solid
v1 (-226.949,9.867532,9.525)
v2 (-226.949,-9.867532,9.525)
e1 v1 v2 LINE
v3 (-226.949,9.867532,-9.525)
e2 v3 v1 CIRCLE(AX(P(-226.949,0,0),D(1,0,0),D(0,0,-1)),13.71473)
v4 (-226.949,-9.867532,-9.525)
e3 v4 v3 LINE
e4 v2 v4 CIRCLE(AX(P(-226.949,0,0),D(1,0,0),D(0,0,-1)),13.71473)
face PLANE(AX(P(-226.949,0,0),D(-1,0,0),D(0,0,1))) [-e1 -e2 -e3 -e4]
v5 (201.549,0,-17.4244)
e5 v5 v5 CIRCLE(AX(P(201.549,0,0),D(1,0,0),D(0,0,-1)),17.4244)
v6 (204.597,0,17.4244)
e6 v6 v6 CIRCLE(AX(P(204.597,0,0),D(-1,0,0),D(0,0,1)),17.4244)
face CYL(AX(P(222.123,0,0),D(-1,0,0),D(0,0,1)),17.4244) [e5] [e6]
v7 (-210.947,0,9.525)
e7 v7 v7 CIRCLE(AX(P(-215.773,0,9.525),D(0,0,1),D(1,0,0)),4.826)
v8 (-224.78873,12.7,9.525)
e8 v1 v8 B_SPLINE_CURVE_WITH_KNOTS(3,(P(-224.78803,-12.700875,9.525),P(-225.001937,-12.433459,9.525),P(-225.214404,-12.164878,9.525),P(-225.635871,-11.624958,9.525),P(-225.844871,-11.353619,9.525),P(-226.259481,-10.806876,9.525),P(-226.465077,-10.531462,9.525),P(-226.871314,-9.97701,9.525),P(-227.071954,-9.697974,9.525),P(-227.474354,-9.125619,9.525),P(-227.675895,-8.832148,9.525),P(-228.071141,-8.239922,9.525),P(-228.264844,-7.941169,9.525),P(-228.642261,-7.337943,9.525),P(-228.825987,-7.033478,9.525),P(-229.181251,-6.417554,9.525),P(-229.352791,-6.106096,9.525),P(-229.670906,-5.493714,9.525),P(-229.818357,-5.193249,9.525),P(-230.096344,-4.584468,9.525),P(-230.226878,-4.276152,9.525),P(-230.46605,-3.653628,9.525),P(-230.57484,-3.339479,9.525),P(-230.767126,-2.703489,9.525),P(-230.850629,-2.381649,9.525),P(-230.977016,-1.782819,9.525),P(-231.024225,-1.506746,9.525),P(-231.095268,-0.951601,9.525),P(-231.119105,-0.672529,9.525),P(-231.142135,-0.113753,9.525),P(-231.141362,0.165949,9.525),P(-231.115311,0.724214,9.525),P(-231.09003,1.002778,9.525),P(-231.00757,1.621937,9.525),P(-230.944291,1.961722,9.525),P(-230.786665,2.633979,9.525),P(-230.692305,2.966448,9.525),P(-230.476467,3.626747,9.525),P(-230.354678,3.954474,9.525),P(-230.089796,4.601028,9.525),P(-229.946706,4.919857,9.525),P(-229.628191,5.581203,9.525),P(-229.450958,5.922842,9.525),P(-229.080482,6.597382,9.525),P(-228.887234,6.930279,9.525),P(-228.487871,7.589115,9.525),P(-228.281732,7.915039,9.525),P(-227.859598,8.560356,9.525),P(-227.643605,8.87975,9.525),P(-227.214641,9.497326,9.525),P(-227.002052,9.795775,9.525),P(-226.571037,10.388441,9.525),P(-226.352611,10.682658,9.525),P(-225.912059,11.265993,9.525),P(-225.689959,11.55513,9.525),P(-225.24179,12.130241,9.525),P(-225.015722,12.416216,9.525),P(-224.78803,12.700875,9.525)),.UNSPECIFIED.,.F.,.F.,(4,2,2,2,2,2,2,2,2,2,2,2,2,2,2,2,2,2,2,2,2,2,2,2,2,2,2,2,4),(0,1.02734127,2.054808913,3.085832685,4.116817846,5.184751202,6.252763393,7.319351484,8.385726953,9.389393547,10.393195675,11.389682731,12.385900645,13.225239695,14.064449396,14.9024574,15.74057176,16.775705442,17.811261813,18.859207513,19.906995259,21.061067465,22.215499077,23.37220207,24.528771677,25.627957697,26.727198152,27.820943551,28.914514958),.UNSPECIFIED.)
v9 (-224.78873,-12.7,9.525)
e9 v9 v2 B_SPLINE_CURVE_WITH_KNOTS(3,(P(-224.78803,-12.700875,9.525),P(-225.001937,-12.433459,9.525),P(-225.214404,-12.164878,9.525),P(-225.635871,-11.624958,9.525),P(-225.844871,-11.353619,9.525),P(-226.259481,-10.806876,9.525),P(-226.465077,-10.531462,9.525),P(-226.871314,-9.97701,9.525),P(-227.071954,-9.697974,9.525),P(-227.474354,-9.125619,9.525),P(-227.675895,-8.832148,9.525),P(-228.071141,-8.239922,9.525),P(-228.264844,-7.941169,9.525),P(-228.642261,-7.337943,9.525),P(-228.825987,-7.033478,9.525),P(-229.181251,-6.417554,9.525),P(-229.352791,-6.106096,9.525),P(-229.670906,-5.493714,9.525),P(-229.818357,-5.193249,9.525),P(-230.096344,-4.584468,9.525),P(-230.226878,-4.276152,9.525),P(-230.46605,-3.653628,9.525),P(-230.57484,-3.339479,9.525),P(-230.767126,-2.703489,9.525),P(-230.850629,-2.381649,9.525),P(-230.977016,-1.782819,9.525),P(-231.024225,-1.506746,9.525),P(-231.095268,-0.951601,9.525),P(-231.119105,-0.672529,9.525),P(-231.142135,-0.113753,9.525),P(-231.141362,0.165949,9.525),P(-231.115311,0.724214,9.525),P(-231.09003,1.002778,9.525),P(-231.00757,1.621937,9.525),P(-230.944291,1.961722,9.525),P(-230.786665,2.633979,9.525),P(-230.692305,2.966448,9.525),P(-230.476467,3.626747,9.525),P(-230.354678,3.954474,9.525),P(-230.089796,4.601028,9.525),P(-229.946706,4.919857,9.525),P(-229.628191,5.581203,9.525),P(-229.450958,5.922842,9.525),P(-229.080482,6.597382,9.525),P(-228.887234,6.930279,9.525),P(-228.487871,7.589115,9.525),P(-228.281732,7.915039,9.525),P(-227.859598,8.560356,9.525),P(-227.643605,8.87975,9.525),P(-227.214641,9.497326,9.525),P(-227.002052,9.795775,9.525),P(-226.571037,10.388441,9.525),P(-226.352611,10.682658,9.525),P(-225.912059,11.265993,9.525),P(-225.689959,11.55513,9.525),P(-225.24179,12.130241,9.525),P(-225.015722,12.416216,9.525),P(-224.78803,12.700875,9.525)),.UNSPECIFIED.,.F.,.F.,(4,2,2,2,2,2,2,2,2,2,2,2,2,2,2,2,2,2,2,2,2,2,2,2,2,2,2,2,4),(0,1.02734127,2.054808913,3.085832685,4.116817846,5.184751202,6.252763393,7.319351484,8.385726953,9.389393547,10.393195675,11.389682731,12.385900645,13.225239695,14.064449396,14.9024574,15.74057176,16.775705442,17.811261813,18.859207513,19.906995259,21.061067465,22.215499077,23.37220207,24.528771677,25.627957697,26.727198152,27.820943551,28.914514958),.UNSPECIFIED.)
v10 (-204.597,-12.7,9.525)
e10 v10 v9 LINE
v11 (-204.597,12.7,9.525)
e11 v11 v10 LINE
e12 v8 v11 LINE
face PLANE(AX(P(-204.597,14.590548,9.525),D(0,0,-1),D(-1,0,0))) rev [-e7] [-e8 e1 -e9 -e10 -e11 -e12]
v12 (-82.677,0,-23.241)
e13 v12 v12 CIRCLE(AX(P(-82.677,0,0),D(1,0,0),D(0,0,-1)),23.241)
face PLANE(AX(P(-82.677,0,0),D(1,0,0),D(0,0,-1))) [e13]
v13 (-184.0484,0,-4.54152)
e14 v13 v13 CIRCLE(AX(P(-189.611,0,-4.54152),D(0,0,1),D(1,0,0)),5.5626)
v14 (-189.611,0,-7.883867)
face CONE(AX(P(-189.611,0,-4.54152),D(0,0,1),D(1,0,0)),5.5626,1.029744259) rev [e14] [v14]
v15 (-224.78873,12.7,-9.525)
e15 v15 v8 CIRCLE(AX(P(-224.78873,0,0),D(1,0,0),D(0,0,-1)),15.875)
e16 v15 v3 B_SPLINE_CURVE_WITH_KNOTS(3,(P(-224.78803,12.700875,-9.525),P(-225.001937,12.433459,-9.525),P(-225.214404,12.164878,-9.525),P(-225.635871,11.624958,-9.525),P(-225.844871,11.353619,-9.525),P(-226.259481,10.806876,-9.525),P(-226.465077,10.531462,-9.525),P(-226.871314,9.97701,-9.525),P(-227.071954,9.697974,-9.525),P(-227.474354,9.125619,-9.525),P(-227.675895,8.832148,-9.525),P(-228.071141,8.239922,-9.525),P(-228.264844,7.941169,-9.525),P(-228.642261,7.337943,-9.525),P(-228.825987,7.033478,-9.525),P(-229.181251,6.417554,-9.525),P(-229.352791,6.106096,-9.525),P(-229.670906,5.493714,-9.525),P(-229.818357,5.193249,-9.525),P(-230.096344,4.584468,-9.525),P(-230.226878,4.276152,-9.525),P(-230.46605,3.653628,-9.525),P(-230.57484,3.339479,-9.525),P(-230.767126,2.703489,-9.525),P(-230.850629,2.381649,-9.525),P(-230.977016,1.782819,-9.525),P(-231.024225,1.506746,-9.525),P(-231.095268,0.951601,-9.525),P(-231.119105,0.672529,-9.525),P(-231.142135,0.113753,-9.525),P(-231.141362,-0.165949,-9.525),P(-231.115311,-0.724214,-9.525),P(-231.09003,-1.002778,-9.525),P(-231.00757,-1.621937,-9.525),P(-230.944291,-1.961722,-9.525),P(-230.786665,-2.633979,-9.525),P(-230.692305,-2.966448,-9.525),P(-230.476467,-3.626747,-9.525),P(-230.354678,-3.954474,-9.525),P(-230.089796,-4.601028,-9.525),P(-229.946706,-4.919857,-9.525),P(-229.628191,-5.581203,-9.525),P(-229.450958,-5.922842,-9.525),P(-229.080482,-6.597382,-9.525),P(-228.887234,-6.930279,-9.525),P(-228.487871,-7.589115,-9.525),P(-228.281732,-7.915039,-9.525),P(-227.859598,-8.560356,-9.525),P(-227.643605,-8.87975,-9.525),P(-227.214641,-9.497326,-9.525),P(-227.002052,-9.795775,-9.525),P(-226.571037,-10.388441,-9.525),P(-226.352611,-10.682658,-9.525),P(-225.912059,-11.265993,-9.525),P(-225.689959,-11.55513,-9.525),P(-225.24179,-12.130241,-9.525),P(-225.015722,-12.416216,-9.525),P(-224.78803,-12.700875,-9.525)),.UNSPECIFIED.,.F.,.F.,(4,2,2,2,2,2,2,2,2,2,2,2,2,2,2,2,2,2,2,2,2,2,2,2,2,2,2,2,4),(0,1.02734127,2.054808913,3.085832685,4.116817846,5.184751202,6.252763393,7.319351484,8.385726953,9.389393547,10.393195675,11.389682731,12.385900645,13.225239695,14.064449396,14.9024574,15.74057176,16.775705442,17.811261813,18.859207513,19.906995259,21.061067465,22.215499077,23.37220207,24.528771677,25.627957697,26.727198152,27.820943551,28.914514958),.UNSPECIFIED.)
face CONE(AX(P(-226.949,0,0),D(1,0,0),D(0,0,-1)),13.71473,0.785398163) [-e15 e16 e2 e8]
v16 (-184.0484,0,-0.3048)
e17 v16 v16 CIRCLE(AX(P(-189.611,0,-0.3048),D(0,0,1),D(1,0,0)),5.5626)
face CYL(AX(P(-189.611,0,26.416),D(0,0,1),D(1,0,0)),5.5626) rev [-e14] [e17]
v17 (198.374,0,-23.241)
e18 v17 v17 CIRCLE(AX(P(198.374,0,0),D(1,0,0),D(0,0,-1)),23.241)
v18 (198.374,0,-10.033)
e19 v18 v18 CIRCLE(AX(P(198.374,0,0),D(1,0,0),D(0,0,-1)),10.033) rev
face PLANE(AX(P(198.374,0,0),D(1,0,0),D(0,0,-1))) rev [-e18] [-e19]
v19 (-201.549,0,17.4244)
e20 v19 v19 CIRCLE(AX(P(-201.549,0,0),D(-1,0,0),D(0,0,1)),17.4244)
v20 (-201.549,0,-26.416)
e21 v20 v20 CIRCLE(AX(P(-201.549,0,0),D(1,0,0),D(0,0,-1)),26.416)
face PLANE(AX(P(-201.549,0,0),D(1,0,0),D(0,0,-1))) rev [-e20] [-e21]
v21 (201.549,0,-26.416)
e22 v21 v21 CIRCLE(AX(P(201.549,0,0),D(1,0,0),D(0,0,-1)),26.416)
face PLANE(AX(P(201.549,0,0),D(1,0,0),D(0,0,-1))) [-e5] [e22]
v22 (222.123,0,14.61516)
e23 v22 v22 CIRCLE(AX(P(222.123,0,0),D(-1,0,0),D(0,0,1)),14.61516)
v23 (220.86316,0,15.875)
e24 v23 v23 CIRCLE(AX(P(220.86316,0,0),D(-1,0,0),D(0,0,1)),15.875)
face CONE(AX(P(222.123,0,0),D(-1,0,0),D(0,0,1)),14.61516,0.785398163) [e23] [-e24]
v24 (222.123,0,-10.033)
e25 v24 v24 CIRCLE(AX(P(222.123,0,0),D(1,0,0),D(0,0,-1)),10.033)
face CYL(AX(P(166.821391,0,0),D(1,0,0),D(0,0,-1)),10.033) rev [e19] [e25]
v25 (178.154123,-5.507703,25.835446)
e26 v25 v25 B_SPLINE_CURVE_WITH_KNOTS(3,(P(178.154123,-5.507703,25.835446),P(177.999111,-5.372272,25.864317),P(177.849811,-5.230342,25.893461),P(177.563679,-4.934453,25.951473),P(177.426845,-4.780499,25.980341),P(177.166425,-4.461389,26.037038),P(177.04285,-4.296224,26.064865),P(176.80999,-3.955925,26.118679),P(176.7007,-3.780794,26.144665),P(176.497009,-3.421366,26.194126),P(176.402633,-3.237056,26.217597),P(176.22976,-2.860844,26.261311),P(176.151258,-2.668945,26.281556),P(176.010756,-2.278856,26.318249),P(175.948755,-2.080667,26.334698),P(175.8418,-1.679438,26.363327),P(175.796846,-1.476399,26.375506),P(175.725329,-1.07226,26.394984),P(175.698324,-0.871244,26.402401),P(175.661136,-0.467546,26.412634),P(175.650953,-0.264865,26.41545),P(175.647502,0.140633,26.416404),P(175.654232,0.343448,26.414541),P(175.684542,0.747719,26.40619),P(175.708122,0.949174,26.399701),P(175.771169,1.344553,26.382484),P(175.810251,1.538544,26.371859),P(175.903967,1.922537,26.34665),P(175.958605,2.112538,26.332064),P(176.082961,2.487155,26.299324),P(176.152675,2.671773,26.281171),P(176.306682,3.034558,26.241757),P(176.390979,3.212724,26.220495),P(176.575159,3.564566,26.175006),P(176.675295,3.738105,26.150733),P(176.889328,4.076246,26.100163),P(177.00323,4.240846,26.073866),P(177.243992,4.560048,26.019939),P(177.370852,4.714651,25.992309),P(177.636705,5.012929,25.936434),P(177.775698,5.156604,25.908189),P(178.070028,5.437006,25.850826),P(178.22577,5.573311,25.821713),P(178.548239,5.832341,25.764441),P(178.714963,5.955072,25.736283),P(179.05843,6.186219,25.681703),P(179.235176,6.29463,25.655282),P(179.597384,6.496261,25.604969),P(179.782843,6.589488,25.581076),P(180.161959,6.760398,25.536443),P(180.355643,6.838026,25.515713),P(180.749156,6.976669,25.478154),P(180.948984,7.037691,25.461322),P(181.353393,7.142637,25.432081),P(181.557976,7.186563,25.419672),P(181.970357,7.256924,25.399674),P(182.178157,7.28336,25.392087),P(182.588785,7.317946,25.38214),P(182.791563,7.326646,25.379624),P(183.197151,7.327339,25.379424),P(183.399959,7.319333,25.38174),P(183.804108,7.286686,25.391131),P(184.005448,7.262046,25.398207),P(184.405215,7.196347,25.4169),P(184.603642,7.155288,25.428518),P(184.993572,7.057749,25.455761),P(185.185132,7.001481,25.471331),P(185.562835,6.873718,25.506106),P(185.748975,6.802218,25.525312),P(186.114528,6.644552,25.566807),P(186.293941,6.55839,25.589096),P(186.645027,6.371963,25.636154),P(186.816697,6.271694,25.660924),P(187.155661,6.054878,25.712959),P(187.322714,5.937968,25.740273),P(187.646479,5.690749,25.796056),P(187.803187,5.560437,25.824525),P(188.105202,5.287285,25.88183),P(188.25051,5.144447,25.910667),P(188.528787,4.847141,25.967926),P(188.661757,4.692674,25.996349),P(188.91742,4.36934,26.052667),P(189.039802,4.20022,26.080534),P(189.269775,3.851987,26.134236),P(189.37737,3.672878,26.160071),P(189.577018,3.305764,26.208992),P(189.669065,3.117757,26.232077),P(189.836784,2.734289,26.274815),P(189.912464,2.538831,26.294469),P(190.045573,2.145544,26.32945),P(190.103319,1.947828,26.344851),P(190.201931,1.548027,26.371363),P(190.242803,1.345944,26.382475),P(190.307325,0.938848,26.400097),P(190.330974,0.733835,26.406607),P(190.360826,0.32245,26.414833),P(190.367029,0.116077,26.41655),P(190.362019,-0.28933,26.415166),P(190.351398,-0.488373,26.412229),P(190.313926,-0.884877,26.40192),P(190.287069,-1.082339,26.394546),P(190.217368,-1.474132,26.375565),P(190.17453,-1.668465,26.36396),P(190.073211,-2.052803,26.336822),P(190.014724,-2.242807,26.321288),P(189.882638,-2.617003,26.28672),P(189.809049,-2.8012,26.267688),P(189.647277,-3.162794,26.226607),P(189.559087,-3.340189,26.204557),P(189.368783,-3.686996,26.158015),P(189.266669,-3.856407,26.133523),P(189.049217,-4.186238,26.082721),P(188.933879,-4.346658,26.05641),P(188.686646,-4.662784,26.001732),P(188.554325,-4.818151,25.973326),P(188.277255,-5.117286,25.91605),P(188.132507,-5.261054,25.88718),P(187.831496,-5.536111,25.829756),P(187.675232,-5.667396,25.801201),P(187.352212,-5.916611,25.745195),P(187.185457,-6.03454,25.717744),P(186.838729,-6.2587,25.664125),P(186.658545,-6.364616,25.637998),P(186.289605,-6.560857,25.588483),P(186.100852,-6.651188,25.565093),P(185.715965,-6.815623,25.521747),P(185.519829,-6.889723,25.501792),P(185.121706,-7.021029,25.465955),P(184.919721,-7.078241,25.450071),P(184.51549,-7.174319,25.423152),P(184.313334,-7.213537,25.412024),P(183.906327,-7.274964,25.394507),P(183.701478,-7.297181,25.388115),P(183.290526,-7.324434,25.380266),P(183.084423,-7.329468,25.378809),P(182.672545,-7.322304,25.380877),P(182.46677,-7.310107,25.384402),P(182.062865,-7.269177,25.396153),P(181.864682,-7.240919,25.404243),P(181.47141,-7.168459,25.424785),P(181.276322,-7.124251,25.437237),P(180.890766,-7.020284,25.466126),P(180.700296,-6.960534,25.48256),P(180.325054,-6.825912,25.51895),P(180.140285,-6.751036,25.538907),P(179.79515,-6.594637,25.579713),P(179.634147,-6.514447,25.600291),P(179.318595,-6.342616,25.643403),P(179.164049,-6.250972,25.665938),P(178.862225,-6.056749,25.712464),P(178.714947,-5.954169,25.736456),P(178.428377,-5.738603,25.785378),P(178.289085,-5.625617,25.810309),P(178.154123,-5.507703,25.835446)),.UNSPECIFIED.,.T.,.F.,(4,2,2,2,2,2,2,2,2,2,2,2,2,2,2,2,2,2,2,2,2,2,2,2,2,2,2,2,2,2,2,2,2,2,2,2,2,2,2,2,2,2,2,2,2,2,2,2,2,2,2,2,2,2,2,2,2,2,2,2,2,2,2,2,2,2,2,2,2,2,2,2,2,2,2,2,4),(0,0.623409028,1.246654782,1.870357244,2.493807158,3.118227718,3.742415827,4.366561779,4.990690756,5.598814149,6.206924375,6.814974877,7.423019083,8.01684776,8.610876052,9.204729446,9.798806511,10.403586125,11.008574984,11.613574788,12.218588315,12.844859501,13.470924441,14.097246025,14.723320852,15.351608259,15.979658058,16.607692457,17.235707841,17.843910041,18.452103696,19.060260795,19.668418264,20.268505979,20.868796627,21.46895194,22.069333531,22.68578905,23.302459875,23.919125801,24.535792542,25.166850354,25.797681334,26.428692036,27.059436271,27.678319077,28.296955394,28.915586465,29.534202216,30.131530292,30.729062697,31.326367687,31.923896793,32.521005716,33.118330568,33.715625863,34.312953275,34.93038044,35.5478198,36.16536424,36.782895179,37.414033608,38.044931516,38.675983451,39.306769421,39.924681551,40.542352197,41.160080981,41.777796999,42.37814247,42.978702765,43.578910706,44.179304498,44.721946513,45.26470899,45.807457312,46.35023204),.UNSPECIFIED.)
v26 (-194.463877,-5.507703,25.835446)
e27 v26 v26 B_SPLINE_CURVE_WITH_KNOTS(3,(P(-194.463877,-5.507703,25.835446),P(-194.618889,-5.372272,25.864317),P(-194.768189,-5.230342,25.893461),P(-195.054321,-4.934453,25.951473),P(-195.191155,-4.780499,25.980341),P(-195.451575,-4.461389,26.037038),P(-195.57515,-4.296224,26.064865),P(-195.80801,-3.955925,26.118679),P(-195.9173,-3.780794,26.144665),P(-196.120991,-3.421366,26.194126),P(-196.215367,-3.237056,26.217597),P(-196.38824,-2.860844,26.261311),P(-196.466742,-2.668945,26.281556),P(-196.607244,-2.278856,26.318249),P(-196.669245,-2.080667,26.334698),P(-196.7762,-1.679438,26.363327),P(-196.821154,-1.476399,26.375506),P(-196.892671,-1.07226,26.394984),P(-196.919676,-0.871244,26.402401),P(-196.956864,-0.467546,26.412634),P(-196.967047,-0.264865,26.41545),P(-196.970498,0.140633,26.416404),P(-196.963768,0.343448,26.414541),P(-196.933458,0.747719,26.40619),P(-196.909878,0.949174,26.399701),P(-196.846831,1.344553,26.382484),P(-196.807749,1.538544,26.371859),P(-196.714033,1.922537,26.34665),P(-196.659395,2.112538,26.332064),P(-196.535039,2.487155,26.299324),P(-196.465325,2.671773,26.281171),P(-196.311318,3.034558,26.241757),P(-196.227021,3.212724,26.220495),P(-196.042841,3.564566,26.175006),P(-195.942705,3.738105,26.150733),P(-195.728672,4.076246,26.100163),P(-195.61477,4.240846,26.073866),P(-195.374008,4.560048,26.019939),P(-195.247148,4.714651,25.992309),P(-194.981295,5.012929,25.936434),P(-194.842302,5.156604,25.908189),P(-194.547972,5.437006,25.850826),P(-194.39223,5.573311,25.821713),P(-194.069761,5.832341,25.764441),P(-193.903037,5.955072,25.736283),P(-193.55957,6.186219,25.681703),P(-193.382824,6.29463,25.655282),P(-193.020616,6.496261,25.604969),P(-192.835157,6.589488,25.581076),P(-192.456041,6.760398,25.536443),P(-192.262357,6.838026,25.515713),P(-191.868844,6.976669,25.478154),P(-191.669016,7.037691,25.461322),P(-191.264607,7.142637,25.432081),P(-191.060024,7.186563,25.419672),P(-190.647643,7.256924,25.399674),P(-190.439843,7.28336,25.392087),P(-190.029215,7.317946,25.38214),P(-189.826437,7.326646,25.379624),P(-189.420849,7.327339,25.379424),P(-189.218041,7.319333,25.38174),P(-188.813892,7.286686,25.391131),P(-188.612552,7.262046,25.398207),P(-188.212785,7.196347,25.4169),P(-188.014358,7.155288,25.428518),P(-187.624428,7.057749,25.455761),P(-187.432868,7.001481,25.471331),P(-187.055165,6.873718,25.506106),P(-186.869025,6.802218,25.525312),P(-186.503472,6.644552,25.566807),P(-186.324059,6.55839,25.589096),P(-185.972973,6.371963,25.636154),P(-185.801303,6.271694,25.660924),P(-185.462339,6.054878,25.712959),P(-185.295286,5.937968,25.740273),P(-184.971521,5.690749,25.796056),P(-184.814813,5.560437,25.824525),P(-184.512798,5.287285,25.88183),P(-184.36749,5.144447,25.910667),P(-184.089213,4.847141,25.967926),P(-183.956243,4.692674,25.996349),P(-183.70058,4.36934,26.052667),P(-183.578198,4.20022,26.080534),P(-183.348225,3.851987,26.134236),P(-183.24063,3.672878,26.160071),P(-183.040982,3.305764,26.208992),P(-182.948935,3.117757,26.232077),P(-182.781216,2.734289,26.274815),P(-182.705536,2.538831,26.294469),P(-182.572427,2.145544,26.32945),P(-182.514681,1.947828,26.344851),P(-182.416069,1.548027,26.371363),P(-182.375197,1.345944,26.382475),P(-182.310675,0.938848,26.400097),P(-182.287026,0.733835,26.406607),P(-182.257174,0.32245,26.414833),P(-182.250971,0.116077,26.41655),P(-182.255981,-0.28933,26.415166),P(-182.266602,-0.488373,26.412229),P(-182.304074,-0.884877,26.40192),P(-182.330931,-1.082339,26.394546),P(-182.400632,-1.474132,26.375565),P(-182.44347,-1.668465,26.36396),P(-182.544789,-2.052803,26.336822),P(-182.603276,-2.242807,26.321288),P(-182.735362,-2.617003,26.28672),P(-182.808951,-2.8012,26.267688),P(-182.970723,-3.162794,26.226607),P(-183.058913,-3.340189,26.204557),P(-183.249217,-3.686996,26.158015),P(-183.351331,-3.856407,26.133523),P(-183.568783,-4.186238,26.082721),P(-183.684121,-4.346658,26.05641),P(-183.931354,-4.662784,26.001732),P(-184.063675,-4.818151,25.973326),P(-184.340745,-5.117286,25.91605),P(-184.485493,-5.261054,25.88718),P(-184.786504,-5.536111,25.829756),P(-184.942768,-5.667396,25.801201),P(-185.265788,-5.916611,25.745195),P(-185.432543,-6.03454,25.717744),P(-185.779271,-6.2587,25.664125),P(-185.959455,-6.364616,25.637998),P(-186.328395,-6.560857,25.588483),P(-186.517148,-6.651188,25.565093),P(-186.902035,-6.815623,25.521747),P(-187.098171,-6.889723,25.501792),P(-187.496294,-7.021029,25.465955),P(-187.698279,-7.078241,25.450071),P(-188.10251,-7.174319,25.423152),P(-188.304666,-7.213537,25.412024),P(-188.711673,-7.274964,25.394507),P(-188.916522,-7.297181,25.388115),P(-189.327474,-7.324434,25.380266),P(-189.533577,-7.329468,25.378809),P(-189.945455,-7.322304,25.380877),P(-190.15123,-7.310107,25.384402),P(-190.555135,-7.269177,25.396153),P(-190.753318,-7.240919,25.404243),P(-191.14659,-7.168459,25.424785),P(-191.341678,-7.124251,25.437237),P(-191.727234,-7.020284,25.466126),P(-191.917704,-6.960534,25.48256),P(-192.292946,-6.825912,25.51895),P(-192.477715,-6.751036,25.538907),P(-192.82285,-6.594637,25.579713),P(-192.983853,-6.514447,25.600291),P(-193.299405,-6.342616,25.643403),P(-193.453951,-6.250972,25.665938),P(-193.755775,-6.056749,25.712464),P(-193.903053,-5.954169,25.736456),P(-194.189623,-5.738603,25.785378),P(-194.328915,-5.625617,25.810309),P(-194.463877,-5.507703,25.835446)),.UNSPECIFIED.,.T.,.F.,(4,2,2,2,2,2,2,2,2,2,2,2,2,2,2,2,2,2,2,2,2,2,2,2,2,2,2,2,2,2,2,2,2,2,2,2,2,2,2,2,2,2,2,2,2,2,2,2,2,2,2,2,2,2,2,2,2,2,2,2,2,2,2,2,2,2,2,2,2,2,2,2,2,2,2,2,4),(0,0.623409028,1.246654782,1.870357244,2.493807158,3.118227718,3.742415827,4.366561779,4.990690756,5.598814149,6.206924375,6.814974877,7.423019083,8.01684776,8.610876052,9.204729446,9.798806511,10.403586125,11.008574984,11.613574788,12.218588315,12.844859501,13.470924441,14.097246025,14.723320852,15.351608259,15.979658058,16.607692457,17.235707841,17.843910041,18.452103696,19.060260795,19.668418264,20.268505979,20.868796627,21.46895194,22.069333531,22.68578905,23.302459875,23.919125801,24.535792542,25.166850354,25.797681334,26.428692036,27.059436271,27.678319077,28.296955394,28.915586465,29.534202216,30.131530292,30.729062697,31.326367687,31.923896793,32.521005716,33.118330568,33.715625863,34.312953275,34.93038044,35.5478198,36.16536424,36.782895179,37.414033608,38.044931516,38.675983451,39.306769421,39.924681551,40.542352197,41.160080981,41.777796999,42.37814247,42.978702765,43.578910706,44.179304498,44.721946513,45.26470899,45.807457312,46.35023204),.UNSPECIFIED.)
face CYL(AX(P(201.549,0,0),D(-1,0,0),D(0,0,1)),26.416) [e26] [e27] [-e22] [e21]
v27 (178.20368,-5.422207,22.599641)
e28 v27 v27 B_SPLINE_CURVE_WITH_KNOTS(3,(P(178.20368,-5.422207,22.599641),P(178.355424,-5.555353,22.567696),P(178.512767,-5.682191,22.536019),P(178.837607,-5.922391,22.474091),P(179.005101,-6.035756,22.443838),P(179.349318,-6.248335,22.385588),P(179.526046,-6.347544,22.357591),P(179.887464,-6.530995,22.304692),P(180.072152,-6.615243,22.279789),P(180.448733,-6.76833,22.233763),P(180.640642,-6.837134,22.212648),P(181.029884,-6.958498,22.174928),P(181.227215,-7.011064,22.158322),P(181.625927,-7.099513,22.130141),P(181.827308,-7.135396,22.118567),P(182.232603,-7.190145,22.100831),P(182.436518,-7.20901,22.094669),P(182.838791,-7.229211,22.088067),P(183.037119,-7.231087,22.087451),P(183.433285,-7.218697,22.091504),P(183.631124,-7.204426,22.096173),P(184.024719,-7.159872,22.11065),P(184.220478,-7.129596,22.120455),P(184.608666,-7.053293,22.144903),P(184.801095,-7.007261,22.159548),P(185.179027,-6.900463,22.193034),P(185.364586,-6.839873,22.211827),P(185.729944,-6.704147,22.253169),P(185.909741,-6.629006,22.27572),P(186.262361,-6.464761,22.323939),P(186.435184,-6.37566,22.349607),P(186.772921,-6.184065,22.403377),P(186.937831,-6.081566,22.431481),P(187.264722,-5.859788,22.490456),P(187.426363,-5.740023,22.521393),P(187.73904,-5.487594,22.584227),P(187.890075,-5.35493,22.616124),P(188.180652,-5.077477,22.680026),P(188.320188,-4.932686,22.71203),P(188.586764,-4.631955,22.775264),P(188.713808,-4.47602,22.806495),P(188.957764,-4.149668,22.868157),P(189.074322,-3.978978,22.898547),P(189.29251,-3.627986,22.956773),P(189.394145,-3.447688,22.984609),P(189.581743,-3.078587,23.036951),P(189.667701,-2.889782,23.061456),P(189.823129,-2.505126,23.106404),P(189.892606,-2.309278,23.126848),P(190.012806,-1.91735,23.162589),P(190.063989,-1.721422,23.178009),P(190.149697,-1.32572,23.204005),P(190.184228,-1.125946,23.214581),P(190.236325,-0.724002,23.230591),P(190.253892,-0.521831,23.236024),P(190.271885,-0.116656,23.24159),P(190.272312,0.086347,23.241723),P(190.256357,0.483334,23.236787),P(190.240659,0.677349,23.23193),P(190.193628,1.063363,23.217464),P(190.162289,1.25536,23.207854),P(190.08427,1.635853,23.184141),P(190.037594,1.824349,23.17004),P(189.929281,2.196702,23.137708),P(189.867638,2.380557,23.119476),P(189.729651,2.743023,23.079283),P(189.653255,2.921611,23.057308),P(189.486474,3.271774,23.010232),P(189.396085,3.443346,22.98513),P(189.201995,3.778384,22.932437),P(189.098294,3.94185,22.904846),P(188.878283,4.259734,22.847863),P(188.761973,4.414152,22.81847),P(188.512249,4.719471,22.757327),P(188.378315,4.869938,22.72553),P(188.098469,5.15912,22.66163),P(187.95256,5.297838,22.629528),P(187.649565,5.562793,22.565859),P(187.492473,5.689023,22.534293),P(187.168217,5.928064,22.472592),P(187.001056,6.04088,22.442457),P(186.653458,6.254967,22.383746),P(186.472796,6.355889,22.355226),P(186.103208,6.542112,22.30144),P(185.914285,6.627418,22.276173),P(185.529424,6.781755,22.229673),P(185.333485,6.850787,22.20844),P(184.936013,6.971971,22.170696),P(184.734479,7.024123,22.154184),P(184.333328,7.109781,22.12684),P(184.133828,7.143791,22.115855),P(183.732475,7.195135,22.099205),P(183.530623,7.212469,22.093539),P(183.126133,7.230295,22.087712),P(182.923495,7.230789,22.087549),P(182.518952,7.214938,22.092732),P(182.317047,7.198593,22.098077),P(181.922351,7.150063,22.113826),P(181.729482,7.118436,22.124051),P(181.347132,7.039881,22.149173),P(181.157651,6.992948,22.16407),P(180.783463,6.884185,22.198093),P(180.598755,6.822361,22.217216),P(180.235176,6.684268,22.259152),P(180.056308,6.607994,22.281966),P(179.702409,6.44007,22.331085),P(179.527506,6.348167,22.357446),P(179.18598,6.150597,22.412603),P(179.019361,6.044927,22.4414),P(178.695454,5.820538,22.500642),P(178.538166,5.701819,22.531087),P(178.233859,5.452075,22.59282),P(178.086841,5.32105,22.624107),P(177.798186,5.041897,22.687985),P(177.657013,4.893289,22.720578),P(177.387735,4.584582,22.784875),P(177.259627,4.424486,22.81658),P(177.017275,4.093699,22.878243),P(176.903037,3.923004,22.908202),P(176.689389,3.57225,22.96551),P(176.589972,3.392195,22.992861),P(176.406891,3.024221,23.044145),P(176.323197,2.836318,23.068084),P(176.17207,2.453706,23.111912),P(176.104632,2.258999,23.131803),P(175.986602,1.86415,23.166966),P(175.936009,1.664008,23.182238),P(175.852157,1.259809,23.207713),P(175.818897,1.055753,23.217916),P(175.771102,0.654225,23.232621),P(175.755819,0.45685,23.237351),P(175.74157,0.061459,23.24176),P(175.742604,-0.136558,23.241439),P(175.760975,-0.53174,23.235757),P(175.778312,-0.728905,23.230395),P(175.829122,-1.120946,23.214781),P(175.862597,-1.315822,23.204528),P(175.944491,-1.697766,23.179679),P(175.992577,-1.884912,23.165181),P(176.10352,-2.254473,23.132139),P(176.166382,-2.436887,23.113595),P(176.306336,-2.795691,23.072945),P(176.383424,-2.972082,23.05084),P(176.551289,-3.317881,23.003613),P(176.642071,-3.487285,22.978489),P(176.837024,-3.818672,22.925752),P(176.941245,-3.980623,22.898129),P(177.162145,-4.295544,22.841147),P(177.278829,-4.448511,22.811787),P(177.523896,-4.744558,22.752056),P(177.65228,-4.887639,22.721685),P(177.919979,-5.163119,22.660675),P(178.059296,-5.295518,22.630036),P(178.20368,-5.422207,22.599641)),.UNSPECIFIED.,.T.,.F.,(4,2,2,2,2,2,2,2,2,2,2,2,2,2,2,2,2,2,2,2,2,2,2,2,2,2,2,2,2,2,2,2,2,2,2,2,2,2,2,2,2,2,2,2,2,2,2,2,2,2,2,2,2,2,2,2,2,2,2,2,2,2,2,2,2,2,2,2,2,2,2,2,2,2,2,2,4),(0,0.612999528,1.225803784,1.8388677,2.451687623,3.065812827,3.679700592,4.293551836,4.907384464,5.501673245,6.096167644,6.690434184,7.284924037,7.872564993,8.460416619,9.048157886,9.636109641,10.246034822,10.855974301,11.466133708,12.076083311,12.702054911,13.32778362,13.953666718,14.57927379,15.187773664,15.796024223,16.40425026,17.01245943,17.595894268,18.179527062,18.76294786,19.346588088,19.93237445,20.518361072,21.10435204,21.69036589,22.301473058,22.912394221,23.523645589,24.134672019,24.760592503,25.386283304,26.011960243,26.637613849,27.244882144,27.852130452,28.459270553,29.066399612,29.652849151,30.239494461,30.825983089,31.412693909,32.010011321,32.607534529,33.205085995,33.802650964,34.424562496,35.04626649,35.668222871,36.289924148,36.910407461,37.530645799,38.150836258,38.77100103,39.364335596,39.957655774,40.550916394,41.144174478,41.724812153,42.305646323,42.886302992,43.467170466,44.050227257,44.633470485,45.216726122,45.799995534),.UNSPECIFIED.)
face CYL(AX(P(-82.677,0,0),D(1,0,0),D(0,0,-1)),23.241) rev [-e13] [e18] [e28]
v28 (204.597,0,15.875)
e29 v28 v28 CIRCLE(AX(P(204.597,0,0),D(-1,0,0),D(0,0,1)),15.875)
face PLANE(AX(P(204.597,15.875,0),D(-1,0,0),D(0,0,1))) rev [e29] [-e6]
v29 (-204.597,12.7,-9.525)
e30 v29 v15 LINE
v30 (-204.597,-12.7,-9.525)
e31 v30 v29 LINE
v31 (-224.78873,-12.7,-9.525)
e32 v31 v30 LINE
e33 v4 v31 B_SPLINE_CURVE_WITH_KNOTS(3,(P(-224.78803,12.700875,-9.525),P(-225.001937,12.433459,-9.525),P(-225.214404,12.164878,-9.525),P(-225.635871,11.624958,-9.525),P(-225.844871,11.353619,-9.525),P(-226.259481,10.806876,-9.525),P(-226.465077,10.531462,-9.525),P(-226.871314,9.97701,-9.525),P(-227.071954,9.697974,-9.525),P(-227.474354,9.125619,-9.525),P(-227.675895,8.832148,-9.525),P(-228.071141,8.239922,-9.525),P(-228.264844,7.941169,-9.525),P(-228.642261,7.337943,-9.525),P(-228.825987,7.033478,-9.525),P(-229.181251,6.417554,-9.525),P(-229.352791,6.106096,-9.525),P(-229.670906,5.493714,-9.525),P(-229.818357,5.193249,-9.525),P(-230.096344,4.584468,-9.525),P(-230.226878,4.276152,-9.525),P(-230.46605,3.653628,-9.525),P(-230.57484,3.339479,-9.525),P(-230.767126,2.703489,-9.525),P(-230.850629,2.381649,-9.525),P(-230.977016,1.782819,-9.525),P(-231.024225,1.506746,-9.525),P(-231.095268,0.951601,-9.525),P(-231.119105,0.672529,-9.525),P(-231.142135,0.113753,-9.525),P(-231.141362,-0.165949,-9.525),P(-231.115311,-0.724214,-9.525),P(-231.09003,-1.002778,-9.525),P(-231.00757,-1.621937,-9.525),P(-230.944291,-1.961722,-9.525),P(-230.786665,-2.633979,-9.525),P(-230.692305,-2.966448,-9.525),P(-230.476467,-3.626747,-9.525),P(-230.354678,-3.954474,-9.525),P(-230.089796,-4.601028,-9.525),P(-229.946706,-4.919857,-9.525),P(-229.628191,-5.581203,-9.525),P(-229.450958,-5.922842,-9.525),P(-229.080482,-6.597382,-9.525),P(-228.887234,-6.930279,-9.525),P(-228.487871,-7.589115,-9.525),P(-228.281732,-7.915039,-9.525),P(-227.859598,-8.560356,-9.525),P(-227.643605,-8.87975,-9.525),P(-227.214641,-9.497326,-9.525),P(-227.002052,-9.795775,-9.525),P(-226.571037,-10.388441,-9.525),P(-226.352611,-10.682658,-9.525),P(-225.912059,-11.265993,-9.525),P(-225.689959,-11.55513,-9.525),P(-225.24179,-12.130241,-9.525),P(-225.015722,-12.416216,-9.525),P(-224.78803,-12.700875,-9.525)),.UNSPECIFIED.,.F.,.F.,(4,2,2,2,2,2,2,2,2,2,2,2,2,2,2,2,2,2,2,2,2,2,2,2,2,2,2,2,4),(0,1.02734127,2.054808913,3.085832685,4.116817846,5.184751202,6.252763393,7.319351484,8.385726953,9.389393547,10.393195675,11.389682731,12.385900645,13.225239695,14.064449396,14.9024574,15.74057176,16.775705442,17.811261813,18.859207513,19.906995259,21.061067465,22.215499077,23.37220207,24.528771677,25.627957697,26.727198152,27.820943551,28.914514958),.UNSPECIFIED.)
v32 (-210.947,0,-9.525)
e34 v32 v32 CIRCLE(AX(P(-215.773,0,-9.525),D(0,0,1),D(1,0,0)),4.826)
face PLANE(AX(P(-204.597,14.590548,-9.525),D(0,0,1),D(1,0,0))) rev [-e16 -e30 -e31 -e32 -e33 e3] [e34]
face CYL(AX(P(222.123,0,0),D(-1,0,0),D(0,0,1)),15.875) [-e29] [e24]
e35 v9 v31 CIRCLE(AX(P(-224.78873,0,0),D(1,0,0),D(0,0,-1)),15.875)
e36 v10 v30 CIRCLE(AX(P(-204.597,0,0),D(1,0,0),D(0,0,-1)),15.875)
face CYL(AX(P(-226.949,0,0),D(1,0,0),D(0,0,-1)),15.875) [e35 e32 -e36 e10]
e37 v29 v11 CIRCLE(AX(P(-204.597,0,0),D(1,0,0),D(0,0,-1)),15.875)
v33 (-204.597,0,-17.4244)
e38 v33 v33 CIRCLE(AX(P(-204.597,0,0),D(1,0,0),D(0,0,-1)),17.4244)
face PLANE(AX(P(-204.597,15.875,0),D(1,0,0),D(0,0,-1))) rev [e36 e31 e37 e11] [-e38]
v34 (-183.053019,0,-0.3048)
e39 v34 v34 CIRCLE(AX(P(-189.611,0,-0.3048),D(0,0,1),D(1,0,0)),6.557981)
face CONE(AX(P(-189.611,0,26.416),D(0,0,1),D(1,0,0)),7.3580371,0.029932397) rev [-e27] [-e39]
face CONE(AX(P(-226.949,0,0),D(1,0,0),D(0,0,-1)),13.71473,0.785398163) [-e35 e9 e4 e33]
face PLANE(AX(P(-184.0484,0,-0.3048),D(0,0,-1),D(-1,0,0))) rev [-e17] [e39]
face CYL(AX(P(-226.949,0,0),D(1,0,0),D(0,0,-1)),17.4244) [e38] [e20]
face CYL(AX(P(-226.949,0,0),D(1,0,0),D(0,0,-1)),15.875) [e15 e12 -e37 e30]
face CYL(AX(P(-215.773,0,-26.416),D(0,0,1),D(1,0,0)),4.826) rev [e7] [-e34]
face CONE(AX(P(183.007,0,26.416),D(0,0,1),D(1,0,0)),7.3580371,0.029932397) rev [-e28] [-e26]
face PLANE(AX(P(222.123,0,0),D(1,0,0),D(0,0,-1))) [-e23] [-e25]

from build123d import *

# Parameters (mm, degrees)
SKETCH1_R                         = 26.416
BOSS_EXTRUDE1_DEPTH               = 201.549
SKETCH8_R                         = 17.4244
BOSS_EXTRUDE2_DEPTH               = 25.4
CUT_EXTRUDE1_START                = -22.352
CUT_EXTRUDE1_DEPTH                = 22.352
SKETCH16_R                        = 4.826
CUT_EXTRUDE2_DEPTH                = 232.290745898
BOSS_EXTRUDE3_START               = 20.574
SKETCH17_R                        = 17.4244
BOSS_EXTRUDE3_DEPTH               = 20.574
SKETCH20_R                        = 10.033
CUT_EXTRUDE3_DEPTH                = 23.749
SKETCH22_R                        = 23.241
CUT_EXTRUDE4_DEPTH                = 281.051
F_1_4_NPT_TAPPED_HOLE3_AT_2_COUNT = 2
F_1_4_NPT_TAPPED_HOLE3_AT_2_PITCH = 372.618


# Read off the part's stored shape, not the designer's step: 1-1/4-7 Machine Threads Stud1, 1-1/4-12 Machine Threads Stud1
with BuildPart() as part:
    # Sketch1 → Boss-Extrude1 (new, symmetric)
    with BuildSketch(Plane(origin=(0, 0, 0), x_dir=(0, 0, -1), z_dir=(1, 0, 0))):
        Circle(SKETCH1_R)
    extrude(amount=BOSS_EXTRUDE1_DEPTH, both=True)

    # Sketch8 → Boss-Extrude2 (add)
    with BuildSketch(Plane.ZY.offset(201.549)):
        Circle(SKETCH8_R)
    extrude(amount=BOSS_EXTRUDE2_DEPTH)

    # 1-1/4-7 Machine Threads Stud1 outline → 1-1/4-7 Machine Threads Stud1 (revolve, cut)
    with BuildSketch(Plane.YX):
        Polygon((13.71473, -226.949), (17.4244, -226.949), (17.4244, -204.597), (15.875, -204.597), (15.875, -224.78873), align=None)
    revolve(axis=Axis((0, 0, 0), (1, 0, 0)), mode=Mode.SUBTRACT)

    # Sketch15 → Cut-Extrude1 (cut)
    with BuildSketch(Plane.ZY.offset(226.949).offset(CUT_EXTRUDE1_START)):
        with BuildLine():
            Line((-9.525, 14.59054798), (-9.525, -14.59054798))
            ThreePointArc((-9.525, -14.59054798), (-17.4244, 0), (-9.525, 14.59054798))
        make_face()
        with BuildLine():
            Line((9.525, 14.59054798), (9.525, -14.59054798))
            ThreePointArc((9.525, -14.59054798), (17.4244, 0), (9.525, 14.59054798))
        make_face()
    extrude(amount=CUT_EXTRUDE1_DEPTH, mode=Mode.SUBTRACT)

    # Sketch16 → Cut-Extrude2 (cut, through all)
    with BuildSketch(Plane.XY.offset(9.525)):
        with Locations((-215.773, 0)):
            Circle(SKETCH16_R)
    extrude(amount=-CUT_EXTRUDE2_DEPTH, mode=Mode.SUBTRACT)

    # Sketch17 → Boss-Extrude3 (add)
    with BuildSketch(Plane(origin=(201.549, 0, 0), x_dir=(0, 0, -1), z_dir=(1, 0, 0)).offset(BOSS_EXTRUDE3_START)):
        Circle(SKETCH17_R)
    extrude(amount=-BOSS_EXTRUDE3_DEPTH)

    # Sketch20 → Cut-Extrude3 (cut)
    with BuildSketch(Plane(origin=(222.123, 0, 0), x_dir=(0, 0, -1), z_dir=(1, 0, 0))):
        Circle(SKETCH20_R)
    extrude(amount=-CUT_EXTRUDE3_DEPTH, mode=Mode.SUBTRACT)

    # Sketch22 → Cut-Extrude4 (cut)
    with BuildSketch(Plane(origin=(198.374, 0, 0), x_dir=(0, 0, -1), z_dir=(1, 0, 0))):
        Circle(SKETCH22_R)
    extrude(amount=-CUT_EXTRUDE4_DEPTH, mode=Mode.SUBTRACT)

    # Sketch26 → 1/4 NPT Tapped Hole3 (revolve, cut)
    with BuildSketch(Plane(origin=(-189.611, 0, 26.416), x_dir=(0, -1, 0), z_dir=(1, 0, 0))):
        Polygon((0, 0), (0, 34.299867279), (5.5626, 30.95752), (5.5626, 26.7208), (6.557980564, 26.7208), (7.3580371, 0), align=None)
    f_1_4_npt_tapped_hole3 = revolve(axis=Axis((-189.611, 0, 32.766), (0, 0, -1)), mode=Mode.SUBTRACT)

    # 1/4 NPT Tapped Hole3 at 2: 1/4 NPT Tapped Hole3 ×2
    with Locations(*[(i * F_1_4_NPT_TAPPED_HOLE3_AT_2_PITCH, 0, 0) for i in range(1, F_1_4_NPT_TAPPED_HOLE3_AT_2_COUNT)]):
        add(f_1_4_npt_tapped_hole3, mode=Mode.SUBTRACT)

    # 1-1/4-12 Machine Threads Stud1 outline → 1-1/4-12 Machine Threads Stud1 (revolve, cut)
    with BuildSketch(Plane.YX):
        Polygon((17.4244, 222.123), (14.61516, 222.123), (15.875, 220.86316), (15.875, 204.597), (17.4244, 204.597), align=None)
    revolve(axis=Axis((0, 0, 0), (1, 0, 0)), mode=Mode.SUBTRACT)


solid = part.part
